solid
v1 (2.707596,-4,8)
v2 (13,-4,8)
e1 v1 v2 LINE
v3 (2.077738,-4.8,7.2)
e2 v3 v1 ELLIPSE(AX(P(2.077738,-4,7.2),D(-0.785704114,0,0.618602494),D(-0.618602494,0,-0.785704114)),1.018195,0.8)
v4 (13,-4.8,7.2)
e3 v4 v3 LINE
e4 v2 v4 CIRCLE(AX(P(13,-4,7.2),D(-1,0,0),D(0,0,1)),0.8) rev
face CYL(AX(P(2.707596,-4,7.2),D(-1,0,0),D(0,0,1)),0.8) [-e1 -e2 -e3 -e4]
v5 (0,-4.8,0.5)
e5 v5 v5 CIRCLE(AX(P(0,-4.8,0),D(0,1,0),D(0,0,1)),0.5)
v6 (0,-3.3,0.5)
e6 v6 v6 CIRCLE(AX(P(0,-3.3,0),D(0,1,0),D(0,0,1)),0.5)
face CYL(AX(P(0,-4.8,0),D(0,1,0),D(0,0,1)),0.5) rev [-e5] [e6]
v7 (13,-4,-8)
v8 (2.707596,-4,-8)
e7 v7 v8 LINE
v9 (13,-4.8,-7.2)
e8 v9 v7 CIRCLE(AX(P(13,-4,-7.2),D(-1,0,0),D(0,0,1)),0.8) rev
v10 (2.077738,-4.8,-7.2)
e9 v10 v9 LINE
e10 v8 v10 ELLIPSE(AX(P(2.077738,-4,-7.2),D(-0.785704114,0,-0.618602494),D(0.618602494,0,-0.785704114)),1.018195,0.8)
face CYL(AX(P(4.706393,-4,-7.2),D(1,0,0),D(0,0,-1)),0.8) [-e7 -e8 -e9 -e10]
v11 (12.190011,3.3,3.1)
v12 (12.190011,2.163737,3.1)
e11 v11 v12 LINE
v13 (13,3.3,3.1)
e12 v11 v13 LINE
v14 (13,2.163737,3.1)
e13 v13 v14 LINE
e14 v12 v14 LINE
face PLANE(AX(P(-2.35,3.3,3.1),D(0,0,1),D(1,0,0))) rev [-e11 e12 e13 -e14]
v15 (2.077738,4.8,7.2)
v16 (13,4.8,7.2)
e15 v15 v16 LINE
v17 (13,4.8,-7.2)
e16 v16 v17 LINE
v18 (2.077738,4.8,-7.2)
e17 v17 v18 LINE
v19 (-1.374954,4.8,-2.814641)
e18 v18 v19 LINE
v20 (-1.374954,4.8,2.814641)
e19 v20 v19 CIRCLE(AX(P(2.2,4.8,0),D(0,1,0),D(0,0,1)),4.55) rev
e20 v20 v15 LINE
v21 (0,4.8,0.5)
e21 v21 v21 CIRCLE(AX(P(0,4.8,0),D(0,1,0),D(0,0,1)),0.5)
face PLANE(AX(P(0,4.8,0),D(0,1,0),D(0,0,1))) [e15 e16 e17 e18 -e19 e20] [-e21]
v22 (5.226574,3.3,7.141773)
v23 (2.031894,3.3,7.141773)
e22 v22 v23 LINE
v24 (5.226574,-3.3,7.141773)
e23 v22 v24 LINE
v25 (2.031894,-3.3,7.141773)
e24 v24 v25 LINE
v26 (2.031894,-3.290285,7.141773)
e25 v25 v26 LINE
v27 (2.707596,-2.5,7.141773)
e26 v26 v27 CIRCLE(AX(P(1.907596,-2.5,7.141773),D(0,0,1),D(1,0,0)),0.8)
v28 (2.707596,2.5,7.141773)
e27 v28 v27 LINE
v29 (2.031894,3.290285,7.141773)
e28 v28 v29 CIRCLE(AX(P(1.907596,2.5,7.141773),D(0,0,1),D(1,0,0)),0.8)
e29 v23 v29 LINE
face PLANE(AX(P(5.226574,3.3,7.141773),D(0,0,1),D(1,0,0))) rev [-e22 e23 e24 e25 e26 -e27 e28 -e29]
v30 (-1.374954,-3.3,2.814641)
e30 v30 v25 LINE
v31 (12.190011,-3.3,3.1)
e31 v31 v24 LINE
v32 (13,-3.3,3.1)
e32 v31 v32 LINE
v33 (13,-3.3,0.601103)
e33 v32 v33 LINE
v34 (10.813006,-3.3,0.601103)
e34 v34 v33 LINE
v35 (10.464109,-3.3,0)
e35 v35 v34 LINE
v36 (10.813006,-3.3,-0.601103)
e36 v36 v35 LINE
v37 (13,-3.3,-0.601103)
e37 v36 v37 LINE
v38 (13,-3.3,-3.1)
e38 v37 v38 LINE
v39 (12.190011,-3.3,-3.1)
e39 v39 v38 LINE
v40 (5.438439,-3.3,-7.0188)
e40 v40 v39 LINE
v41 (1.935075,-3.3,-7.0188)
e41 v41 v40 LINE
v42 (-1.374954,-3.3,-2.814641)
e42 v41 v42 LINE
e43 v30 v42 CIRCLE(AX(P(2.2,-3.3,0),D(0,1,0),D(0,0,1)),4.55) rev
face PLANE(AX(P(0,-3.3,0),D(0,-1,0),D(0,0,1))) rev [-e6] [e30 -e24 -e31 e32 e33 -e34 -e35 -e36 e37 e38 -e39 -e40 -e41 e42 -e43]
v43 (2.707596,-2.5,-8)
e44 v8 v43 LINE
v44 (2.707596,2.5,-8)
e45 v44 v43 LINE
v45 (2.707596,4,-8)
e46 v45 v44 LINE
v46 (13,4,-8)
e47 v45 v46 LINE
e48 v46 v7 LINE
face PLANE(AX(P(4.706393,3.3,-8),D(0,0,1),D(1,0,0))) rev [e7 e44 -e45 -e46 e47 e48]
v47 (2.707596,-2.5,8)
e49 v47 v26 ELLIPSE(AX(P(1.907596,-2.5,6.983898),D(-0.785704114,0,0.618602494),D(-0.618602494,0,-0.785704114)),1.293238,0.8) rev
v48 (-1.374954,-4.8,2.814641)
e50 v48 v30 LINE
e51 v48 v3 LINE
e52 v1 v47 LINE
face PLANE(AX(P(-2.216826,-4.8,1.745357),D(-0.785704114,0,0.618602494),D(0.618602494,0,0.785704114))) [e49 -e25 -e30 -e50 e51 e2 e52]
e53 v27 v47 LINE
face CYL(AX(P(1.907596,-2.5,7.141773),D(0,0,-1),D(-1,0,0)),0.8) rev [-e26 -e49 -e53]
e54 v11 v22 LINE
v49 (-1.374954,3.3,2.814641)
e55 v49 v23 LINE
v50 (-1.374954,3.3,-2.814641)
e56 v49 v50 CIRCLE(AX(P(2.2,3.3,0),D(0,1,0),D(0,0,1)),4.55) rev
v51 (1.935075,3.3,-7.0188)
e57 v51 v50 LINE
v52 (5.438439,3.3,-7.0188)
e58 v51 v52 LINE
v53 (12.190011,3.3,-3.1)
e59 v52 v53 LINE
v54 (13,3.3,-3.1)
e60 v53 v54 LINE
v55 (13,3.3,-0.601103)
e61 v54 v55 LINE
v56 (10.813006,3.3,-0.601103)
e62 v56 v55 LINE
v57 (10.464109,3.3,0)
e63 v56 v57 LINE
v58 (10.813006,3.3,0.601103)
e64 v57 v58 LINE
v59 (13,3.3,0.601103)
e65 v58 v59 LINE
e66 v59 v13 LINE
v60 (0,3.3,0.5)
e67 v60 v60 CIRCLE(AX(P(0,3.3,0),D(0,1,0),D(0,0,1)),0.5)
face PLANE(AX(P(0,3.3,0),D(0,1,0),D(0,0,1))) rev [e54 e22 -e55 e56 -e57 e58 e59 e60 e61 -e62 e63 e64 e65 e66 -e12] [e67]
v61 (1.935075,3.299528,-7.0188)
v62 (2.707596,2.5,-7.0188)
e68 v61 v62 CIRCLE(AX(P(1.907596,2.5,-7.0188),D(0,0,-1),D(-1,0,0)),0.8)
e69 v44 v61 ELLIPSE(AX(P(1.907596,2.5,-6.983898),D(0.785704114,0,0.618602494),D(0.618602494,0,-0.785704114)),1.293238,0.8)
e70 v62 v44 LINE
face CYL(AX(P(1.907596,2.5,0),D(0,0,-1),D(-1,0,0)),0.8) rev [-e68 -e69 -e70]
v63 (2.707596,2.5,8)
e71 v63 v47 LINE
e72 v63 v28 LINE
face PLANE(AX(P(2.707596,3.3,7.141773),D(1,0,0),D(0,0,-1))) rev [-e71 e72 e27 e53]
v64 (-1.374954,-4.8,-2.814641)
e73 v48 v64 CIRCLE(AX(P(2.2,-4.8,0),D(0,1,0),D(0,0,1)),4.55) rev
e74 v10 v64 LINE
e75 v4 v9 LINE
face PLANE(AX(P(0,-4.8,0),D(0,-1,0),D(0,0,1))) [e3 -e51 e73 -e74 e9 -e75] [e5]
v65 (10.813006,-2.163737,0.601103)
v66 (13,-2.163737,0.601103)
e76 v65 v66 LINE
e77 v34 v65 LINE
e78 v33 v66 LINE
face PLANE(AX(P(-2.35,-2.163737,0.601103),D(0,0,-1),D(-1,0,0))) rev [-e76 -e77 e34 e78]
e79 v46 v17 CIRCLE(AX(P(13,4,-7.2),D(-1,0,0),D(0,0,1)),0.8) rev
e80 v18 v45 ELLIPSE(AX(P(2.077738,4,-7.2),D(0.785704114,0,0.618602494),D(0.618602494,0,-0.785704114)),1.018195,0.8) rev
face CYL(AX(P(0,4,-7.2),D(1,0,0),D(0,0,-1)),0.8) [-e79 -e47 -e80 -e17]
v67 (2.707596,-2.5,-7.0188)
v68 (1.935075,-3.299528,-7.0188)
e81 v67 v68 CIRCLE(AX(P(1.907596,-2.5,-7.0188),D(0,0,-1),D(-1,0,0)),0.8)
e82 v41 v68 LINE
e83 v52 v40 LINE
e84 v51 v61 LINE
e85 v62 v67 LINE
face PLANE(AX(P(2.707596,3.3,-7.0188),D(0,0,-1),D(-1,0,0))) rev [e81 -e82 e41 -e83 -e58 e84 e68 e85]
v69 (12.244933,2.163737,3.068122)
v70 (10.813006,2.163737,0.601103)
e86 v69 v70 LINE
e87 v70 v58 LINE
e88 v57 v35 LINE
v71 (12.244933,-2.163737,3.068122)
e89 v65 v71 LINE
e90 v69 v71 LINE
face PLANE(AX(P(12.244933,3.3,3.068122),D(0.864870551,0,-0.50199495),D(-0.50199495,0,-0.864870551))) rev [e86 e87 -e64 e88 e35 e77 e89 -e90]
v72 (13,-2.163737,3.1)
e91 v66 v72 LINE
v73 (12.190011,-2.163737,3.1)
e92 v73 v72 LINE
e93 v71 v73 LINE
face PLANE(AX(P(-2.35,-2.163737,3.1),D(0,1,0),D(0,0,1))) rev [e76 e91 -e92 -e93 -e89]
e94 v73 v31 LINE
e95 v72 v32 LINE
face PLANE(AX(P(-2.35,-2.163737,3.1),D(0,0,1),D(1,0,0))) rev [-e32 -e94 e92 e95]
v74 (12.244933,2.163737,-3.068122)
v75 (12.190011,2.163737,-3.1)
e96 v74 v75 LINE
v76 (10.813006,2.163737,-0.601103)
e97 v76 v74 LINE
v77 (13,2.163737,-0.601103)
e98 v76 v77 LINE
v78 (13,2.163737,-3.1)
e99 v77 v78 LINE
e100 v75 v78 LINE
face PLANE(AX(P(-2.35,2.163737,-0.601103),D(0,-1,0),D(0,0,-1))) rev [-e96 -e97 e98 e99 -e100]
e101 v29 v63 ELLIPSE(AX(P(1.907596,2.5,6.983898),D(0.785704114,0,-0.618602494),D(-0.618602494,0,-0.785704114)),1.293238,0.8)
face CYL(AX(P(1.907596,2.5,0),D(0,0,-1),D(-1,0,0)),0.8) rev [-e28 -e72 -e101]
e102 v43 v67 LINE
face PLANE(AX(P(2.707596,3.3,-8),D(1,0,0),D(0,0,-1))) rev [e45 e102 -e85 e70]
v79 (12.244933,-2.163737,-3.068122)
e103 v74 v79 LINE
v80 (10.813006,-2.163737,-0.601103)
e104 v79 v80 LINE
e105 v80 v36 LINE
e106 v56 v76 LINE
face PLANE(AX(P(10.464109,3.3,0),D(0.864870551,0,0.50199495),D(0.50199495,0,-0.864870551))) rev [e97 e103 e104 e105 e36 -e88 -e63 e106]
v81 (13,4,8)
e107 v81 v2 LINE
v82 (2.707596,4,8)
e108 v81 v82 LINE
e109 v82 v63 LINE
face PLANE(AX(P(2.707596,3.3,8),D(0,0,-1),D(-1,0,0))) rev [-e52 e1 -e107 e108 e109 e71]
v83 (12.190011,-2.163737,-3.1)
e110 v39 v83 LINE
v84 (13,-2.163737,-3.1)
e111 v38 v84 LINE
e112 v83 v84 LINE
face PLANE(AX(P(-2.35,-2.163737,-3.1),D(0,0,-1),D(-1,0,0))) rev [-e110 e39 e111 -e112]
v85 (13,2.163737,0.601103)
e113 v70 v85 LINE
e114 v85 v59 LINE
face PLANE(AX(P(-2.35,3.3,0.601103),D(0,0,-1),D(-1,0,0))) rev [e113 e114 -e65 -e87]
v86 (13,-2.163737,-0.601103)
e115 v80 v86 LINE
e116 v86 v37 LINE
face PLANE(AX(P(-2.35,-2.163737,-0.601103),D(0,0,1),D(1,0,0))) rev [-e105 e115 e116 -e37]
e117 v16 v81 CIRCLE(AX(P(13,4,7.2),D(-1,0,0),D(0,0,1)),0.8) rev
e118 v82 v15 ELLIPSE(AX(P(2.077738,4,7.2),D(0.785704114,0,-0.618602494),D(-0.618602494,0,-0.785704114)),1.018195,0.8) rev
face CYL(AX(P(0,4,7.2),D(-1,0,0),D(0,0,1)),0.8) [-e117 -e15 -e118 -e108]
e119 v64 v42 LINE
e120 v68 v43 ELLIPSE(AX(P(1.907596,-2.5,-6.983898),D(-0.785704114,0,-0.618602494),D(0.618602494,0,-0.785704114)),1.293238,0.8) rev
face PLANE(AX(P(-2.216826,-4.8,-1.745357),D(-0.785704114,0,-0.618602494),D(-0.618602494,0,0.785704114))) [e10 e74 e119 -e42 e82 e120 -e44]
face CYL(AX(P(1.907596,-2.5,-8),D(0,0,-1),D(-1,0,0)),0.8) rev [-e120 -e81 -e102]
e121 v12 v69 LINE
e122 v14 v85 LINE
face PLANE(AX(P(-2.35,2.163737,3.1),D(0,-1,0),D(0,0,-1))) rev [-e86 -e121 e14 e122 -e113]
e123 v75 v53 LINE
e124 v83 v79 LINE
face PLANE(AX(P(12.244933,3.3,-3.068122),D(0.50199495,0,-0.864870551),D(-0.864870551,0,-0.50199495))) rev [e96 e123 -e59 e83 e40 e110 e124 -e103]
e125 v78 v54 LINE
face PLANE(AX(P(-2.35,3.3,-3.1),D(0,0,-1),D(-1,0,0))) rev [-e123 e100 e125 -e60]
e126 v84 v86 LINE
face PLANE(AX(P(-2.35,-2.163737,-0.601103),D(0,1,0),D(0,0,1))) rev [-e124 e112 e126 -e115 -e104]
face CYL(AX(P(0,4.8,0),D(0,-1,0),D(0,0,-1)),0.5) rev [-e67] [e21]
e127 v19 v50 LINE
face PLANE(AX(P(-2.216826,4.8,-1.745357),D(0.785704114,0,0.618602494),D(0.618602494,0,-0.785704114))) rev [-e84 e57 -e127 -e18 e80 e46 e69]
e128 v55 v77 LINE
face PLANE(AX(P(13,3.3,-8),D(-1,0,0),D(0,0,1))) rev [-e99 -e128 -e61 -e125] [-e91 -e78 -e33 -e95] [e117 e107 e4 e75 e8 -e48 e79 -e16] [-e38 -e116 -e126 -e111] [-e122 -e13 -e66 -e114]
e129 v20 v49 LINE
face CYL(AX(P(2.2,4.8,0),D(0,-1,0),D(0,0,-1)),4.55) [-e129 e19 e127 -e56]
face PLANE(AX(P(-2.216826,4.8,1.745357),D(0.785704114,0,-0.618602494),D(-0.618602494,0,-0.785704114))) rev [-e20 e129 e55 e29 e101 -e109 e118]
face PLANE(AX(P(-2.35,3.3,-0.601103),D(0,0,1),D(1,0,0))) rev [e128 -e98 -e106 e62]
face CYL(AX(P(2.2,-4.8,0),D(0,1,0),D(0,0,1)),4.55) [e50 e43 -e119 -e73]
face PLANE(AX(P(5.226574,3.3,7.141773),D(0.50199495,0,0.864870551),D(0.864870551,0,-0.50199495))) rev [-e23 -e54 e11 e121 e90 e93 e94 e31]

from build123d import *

# Parameters (mm, degrees)
BOSS_EXTRUDE2_DEPTH = 3.3
SKETCH5_R           = 0.5
SKETCH5_W           = 10.292404403
SKETCH5_H           = 16
BOSS_EXTRUDE3_DEPTH = 1.5
SKETCH7_W           = 2.4988973
SKETCH7_H           = 1.136262802
CUT_EXTRUDE1_DEPTH  = 18.9628088
FILLET1_R           = 0.8
FILLET2_R           = 0.8


with BuildPart() as part:
    # Sketch6 → Boss-Extrude2 (new, symmetric)
    with BuildSketch(Plane(origin=(0, 0, 0), x_dir=(1, 0, 0), z_dir=(0, 1, 0))):
        Polygon((13, 8), (13, -8), (4.706393415, -8), (2.707595597, -8), (2.707595597, -7.141772619), (5.22657427, -7.141772619), (12.244932652, -3.06812199), (10.464109218, 0), (12.244932652, 3.06812199), (5.438439019, 7.01880042), (2.707595597, 7.01880042), (2.707595597, 8), (4.706393415, 8), align=None)
    extrude(amount=BOSS_EXTRUDE2_DEPTH, both=True)

    # Sketch5 → Boss-Extrude3 (add)
    # profile 1 of 2: a face of its own
    with BuildSketch(Plane(origin=(0, 3.3, 0), x_dir=(1, 0, 0), z_dir=(0, 1, 0))):
        with BuildLine():
            Line((2.707595597, -8), (2.707595597, 8))
            Line((2.707595597, 8), (-1.374953719, 2.814641346))
            ThreePointArc((-1.374953719, 2.814641346), (-2.35, 0), (-1.374953719, -2.814641346))
            Line((-1.374953719, -2.814641346), (2.707595597, -8))
        make_face()
        with Locations(Location((0, 0, 0), (0, 0, 270))):
            Circle(SKETCH5_R, mode=Mode.SUBTRACT)
    # profile 2 of 2: a face of its own
    with BuildSketch(Plane(origin=(0, 3.3, 0), x_dir=(1, 0, 0), z_dir=(0, 1, 0))):
        with Locations((7.853797799, 0)):
            Rectangle(SKETCH5_W, SKETCH5_H)
    boss_extrude3 = extrude(amount=BOSS_EXTRUDE3_DEPTH)

    # Mirror1: Boss-Extrude3 across plane
    add(boss_extrude3.mirror(Plane.ZX))

    # Sketch7 → Cut-Extrude1 (cut, through all)
    with BuildSketch(Plane(origin=(13, 0, 0), x_dir=(0, 0, -1), z_dir=(1, 0, 0))):
        with Locations((-1.85055135, 2.731868599)):
            Rectangle(SKETCH7_W, SKETCH7_H)
        with Locations((1.85055135, 2.731868599)):
            Rectangle(SKETCH7_W, SKETCH7_H)
        with Locations((-1.85055135, -2.731868599)):
            Rectangle(SKETCH7_W, SKETCH7_H)
        with Locations((1.85055135, -2.731868599)):
            Rectangle(SKETCH7_W, SKETCH7_H)
    extrude(amount=-CUT_EXTRUDE1_DEPTH, mode=Mode.SUBTRACT)

    # Fillet1
    # the kernel refuses this fillet: 0.8 mm, written as the material it adds along each edge
    with BuildSketch(Plane(origin=(2.707595597, -3.3, 8), x_dir=(0, 1, 0), z_dir=(0, 0, -1))) as fillet1_piece_1_section:
        with BuildLine():
            CenterArc((FILLET1_R, -FILLET1_R), FILLET1_R, 90, 90)
            Line((0, -FILLET1_R), (0, 0))
            Line((0, 0), (FILLET1_R, 0))
        make_face()
    fillet1_piece_1 = extrude(amount=0.858227381, mode=Mode.PRIVATE)
    fillet1_piece_1 = split(fillet1_piece_1, bisect_by=Plane(origin=(2.414269103, -3.083958399, 7.627437917), z_dir=(0.785704114090993, 0, -0.6186024936099819)), keep=Keep.TOP, mode=Mode.PRIVATE)
    add(fillet1_piece_1)
    with BuildSketch(Plane(origin=(2.707595597, -3.3, -7.01880042), x_dir=(0, 1, 0), z_dir=(0, 0, -1))) as fillet1_piece_2_section:
        with BuildLine():
            CenterArc((FILLET1_R, -FILLET1_R), FILLET1_R, 90, 90)
            Line((0, -FILLET1_R), (0, 0))
            Line((0, 0), (FILLET1_R, 0))
        make_face()
    fillet1_piece_2 = extrude(amount=0.98119958, mode=Mode.PRIVATE)
    fillet1_piece_2 = split(fillet1_piece_2, bisect_by=Plane(origin=(2.378311496, -3.089381115, -7.581767168), z_dir=(0.7857041140909933, 0, 0.6186024936099818)), keep=Keep.TOP, mode=Mode.PRIVATE)
    add(fillet1_piece_2)
    with BuildSketch(Plane(origin=(2.707595597, 3.3, -7.01880042), x_dir=(0, -1, 0), z_dir=(0, 0, -1))) as fillet1_piece_3_section:
        with BuildLine():
            CenterArc((FILLET1_R, FILLET1_R), FILLET1_R, 180, 90)
            Line((0, FILLET1_R), (0, 0))
            Line((0, 0), (FILLET1_R, 0))
        make_face()
    fillet1_piece_3 = extrude(amount=0.98119958, mode=Mode.PRIVATE)
    fillet1_piece_3 = split(fillet1_piece_3, bisect_by=Plane(origin=(2.378311496, 3.089381115, -7.581767168), z_dir=(0.7857041140909933, 0, 0.6186024936099818)), keep=Keep.TOP, mode=Mode.PRIVATE)
    add(fillet1_piece_3)
    with BuildSketch(Plane(origin=(2.707595597, 3.3, 8), x_dir=(0, -1, 0), z_dir=(0, 0, -1))) as fillet1_piece_4_section:
        with BuildLine():
            CenterArc((FILLET1_R, FILLET1_R), FILLET1_R, 180, 90)
            Line((0, FILLET1_R), (0, 0))
            Line((0, 0), (FILLET1_R, 0))
        make_face()
    fillet1_piece_4 = extrude(amount=0.858227381, mode=Mode.PRIVATE)
    fillet1_piece_4 = split(fillet1_piece_4, bisect_by=Plane(origin=(2.414269103, 3.083958399, 7.627437917), z_dir=(0.785704114090993, 0, -0.6186024936099819)), keep=Keep.TOP, mode=Mode.PRIVATE)
    add(fillet1_piece_4)

    # Fillet2
    fillet2_edges = [part.edges().sort_by_distance(p)[0] for p in [
        (7.853797799, 4.8, 8),
        (7.853797799, 4.8, -8),
        (7.853797799, -4.8, -8),
        (7.853797799, -4.8, 8),
    ]]
    fillet(fillet2_edges, radius=FILLET2_R)


solid = part.part
